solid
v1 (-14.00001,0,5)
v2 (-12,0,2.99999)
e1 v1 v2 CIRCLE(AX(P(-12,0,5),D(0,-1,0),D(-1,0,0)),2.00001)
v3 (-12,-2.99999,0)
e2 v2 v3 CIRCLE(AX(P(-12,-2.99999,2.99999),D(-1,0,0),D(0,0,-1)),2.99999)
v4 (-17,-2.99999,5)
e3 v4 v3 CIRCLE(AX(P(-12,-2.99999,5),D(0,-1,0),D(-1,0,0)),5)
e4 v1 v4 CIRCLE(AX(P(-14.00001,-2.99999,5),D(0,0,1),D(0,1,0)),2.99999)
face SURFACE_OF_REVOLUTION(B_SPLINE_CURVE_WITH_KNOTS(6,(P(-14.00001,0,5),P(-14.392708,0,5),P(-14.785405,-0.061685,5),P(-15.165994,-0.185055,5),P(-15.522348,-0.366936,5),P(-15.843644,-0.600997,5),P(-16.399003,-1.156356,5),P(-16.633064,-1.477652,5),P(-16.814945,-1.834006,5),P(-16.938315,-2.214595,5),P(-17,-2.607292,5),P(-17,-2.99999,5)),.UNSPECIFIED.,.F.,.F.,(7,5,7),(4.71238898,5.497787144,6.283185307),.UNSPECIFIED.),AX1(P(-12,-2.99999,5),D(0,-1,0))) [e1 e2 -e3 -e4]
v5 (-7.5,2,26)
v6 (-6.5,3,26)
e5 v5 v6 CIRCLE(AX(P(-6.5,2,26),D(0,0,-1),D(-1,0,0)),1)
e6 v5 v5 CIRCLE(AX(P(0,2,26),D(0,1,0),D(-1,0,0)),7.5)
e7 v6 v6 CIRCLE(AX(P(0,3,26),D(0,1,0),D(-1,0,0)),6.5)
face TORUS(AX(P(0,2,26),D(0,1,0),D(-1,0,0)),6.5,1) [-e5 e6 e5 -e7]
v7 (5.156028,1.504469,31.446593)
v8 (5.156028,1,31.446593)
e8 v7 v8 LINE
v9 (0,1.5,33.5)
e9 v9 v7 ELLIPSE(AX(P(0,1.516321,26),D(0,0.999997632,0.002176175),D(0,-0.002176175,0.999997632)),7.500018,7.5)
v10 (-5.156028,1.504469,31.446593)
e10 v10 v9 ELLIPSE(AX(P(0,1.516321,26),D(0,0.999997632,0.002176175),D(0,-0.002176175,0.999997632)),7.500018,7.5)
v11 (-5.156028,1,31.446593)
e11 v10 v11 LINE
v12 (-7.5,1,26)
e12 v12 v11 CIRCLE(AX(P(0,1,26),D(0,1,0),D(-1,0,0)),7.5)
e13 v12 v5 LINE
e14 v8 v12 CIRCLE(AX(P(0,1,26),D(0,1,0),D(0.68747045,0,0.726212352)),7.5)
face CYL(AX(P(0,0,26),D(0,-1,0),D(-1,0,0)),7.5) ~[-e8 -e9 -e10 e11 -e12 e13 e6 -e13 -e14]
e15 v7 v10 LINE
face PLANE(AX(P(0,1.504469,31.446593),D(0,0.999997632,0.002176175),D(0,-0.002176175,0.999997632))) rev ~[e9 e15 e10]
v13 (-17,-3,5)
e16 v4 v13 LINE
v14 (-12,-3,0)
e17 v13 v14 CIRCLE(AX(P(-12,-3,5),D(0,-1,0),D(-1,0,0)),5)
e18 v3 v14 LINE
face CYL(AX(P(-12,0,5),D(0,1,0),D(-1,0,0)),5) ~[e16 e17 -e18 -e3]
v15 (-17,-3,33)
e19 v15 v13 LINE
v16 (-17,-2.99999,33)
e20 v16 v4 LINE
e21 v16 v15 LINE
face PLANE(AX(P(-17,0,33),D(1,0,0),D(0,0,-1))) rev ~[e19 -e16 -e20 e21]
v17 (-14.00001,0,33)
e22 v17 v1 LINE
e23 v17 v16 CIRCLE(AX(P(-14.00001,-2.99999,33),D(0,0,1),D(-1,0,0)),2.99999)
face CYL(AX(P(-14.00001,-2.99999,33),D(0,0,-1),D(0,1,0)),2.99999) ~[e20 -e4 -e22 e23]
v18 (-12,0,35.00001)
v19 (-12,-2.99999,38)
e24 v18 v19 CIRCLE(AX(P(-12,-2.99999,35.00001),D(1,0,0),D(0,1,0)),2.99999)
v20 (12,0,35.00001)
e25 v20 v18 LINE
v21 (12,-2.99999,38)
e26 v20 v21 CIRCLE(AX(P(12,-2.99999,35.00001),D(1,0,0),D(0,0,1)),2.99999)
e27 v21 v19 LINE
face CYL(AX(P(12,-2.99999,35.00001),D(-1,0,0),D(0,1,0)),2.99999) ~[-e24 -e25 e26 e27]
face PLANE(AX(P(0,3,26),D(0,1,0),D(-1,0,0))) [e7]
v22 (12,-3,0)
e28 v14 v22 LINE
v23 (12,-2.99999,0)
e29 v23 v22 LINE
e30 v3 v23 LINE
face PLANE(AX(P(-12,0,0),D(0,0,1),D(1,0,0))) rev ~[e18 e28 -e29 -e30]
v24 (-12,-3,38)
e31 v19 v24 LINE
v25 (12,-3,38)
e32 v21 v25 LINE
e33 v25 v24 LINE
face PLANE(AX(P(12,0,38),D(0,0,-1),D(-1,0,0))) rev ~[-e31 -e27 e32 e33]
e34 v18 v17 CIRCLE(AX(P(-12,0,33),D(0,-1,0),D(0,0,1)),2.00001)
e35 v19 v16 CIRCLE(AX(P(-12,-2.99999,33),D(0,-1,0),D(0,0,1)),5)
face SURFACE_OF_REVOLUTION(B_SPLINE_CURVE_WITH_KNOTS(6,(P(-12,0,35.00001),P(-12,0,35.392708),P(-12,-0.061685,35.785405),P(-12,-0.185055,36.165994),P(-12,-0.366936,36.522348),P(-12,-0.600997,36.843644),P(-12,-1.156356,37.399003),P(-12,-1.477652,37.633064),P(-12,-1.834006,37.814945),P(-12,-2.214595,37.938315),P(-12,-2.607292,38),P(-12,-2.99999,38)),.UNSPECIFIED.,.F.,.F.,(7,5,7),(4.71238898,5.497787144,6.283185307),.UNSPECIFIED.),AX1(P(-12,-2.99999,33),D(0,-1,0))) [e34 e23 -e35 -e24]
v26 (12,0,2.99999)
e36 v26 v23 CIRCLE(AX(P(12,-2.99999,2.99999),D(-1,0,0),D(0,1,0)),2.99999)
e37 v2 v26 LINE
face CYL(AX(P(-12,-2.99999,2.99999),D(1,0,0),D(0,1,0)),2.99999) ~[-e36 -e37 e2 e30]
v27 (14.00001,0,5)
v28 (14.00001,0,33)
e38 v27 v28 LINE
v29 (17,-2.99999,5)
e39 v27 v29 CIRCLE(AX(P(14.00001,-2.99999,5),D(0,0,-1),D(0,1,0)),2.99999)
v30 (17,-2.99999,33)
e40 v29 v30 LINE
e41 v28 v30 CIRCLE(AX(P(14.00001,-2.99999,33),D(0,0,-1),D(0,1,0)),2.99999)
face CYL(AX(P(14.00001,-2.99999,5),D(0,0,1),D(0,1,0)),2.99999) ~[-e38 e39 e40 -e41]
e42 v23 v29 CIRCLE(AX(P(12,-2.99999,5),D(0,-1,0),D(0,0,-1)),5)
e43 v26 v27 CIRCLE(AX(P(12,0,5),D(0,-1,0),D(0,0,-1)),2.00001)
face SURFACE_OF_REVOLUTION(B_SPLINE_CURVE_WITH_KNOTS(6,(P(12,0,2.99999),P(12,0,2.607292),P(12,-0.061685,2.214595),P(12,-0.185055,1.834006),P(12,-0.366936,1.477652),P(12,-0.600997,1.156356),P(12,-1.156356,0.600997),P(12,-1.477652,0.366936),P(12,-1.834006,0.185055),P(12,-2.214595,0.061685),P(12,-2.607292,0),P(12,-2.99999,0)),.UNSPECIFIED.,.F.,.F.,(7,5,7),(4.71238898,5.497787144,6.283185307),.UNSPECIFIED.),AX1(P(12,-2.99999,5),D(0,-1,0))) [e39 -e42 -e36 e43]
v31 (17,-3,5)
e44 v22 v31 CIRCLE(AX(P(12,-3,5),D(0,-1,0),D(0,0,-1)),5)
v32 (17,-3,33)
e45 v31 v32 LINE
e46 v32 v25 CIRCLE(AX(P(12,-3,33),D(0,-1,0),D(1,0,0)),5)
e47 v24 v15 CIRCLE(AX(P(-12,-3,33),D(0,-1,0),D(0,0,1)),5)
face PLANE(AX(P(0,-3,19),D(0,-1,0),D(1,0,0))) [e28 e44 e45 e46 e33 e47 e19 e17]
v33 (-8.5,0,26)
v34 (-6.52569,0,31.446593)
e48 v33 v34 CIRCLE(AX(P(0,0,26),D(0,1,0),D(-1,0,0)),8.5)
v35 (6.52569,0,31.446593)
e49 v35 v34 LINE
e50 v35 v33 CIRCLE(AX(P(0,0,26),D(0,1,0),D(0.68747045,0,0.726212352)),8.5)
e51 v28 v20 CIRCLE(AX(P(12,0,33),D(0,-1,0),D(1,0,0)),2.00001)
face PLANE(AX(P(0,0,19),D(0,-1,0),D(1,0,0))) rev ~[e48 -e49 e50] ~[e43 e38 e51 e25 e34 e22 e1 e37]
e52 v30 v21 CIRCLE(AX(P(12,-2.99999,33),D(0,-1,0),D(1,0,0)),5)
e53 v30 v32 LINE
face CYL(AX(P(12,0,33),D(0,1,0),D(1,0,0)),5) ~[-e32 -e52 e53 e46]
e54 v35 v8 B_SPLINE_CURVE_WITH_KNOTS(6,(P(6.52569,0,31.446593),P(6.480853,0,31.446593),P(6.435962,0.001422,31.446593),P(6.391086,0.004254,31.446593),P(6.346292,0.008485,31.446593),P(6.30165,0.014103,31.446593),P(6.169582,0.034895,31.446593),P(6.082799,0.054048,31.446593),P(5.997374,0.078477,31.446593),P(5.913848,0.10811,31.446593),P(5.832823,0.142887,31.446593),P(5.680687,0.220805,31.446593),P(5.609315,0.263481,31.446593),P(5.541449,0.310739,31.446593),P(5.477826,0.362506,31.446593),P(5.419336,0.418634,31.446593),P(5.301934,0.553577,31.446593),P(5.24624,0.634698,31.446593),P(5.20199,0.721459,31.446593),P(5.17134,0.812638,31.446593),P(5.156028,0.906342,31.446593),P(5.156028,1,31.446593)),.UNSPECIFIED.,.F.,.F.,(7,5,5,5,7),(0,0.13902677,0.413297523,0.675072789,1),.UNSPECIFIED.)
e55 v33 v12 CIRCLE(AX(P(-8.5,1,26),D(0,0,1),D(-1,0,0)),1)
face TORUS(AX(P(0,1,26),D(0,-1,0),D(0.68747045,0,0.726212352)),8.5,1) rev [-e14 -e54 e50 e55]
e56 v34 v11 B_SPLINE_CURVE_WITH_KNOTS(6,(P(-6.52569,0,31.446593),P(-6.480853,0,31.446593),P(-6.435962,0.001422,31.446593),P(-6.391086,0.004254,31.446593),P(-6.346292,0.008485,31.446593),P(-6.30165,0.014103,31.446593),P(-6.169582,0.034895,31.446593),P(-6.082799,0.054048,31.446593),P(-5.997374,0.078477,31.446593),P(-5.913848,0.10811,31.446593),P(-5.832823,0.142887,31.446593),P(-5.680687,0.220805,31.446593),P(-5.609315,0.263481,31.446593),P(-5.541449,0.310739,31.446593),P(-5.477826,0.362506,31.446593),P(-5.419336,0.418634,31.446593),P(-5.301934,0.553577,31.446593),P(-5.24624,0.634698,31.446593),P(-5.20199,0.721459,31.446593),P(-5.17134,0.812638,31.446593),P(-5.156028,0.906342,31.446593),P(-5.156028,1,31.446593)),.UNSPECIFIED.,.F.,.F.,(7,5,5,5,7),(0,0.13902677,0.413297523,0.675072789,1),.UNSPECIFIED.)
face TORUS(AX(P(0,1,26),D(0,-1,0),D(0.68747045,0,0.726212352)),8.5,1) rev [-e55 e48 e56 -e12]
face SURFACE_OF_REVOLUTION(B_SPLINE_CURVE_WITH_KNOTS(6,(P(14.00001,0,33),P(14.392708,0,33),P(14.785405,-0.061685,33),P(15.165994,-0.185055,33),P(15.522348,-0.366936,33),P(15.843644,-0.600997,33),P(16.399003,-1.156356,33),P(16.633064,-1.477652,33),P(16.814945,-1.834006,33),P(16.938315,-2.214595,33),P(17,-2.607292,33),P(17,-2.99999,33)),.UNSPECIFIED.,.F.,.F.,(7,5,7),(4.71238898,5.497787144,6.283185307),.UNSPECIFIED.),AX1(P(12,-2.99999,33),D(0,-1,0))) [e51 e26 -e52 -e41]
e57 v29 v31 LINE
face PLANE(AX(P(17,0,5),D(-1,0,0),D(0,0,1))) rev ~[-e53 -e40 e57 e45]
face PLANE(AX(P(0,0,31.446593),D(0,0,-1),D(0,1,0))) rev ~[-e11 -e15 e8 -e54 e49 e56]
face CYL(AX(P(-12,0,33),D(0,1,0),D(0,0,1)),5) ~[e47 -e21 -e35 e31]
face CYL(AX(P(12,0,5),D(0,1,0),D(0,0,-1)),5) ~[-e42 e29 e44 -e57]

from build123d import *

# Parameters (mm, degrees)
F1_DEPTH = 3
F2_R     = 7.5
F3_DEPTH = 3
F5_DEPTH = 12.5
F6_R     = 2.99999
F7_R     = 1


# Not quite as in the source:
# - a fillet or chamfer is up to 0.001 mm smaller than in the source, because OpenCascade refuses the exact size


with BuildPart() as f1:
    # F0 (on Front) → F1 (new body)
    with BuildSketch(Plane.XZ):
        with BuildLine():
            ThreePointArc((-17, 5), (-15.5355339059, 1.4644660941), (-12, 0))
            Line((-12, 0), (12, 0))
            ThreePointArc((12, 0), (15.5355339059, 1.4644660941), (17, 5))
            Line((17, 5), (17, 33))
            ThreePointArc((17, 33), (15.5355339059, 36.5355339059), (12, 38))
            Line((12, 38), (-12, 38))
            ThreePointArc((-12, 38), (-15.5355339059, 36.5355339059), (-17, 33))
            Line((-17, 33), (-17, 5))
        make_face()
    extrude(amount=F1_DEPTH)

    # F2 (on face) → F3 (join)
    with BuildSketch(Plane(origin=(0, 0, 0), x_dir=(-1, 0, 0), z_dir=(0, 1, 0))):
        with Locations((0, 26)):
            Circle(F2_R)
    extrude(amount=F3_DEPTH)

    # F4 (on Right) → F5 (cut, symmetric)
    with BuildSketch(Plane.YZ):
        Polygon((1.5, 33.5), (0, 33.5), (0, 31.4465926395), (1.504468584, 31.4465926395), align=None)
    extrude(amount=F5_DEPTH, both=True, mode=Mode.SUBTRACT)

    # F6 (radius 3 in the source; OpenCascade refuses exactly that, so slightly less here)
    f6_edges = [f1.edges().sort_by_distance(p)[0] for p in [
        (17, 0, 19),
    ]]
    fillet(f6_edges, radius=F6_R)

    # F7
    f7_edges = [f1.edges().sort_by_distance(p)[0] for p in [
        (7.5, 3, 26),
        (2.964775, 0, 19.11087),
    ]]
    fillet(f7_edges, radius=F7_R)


solid = f1.part
